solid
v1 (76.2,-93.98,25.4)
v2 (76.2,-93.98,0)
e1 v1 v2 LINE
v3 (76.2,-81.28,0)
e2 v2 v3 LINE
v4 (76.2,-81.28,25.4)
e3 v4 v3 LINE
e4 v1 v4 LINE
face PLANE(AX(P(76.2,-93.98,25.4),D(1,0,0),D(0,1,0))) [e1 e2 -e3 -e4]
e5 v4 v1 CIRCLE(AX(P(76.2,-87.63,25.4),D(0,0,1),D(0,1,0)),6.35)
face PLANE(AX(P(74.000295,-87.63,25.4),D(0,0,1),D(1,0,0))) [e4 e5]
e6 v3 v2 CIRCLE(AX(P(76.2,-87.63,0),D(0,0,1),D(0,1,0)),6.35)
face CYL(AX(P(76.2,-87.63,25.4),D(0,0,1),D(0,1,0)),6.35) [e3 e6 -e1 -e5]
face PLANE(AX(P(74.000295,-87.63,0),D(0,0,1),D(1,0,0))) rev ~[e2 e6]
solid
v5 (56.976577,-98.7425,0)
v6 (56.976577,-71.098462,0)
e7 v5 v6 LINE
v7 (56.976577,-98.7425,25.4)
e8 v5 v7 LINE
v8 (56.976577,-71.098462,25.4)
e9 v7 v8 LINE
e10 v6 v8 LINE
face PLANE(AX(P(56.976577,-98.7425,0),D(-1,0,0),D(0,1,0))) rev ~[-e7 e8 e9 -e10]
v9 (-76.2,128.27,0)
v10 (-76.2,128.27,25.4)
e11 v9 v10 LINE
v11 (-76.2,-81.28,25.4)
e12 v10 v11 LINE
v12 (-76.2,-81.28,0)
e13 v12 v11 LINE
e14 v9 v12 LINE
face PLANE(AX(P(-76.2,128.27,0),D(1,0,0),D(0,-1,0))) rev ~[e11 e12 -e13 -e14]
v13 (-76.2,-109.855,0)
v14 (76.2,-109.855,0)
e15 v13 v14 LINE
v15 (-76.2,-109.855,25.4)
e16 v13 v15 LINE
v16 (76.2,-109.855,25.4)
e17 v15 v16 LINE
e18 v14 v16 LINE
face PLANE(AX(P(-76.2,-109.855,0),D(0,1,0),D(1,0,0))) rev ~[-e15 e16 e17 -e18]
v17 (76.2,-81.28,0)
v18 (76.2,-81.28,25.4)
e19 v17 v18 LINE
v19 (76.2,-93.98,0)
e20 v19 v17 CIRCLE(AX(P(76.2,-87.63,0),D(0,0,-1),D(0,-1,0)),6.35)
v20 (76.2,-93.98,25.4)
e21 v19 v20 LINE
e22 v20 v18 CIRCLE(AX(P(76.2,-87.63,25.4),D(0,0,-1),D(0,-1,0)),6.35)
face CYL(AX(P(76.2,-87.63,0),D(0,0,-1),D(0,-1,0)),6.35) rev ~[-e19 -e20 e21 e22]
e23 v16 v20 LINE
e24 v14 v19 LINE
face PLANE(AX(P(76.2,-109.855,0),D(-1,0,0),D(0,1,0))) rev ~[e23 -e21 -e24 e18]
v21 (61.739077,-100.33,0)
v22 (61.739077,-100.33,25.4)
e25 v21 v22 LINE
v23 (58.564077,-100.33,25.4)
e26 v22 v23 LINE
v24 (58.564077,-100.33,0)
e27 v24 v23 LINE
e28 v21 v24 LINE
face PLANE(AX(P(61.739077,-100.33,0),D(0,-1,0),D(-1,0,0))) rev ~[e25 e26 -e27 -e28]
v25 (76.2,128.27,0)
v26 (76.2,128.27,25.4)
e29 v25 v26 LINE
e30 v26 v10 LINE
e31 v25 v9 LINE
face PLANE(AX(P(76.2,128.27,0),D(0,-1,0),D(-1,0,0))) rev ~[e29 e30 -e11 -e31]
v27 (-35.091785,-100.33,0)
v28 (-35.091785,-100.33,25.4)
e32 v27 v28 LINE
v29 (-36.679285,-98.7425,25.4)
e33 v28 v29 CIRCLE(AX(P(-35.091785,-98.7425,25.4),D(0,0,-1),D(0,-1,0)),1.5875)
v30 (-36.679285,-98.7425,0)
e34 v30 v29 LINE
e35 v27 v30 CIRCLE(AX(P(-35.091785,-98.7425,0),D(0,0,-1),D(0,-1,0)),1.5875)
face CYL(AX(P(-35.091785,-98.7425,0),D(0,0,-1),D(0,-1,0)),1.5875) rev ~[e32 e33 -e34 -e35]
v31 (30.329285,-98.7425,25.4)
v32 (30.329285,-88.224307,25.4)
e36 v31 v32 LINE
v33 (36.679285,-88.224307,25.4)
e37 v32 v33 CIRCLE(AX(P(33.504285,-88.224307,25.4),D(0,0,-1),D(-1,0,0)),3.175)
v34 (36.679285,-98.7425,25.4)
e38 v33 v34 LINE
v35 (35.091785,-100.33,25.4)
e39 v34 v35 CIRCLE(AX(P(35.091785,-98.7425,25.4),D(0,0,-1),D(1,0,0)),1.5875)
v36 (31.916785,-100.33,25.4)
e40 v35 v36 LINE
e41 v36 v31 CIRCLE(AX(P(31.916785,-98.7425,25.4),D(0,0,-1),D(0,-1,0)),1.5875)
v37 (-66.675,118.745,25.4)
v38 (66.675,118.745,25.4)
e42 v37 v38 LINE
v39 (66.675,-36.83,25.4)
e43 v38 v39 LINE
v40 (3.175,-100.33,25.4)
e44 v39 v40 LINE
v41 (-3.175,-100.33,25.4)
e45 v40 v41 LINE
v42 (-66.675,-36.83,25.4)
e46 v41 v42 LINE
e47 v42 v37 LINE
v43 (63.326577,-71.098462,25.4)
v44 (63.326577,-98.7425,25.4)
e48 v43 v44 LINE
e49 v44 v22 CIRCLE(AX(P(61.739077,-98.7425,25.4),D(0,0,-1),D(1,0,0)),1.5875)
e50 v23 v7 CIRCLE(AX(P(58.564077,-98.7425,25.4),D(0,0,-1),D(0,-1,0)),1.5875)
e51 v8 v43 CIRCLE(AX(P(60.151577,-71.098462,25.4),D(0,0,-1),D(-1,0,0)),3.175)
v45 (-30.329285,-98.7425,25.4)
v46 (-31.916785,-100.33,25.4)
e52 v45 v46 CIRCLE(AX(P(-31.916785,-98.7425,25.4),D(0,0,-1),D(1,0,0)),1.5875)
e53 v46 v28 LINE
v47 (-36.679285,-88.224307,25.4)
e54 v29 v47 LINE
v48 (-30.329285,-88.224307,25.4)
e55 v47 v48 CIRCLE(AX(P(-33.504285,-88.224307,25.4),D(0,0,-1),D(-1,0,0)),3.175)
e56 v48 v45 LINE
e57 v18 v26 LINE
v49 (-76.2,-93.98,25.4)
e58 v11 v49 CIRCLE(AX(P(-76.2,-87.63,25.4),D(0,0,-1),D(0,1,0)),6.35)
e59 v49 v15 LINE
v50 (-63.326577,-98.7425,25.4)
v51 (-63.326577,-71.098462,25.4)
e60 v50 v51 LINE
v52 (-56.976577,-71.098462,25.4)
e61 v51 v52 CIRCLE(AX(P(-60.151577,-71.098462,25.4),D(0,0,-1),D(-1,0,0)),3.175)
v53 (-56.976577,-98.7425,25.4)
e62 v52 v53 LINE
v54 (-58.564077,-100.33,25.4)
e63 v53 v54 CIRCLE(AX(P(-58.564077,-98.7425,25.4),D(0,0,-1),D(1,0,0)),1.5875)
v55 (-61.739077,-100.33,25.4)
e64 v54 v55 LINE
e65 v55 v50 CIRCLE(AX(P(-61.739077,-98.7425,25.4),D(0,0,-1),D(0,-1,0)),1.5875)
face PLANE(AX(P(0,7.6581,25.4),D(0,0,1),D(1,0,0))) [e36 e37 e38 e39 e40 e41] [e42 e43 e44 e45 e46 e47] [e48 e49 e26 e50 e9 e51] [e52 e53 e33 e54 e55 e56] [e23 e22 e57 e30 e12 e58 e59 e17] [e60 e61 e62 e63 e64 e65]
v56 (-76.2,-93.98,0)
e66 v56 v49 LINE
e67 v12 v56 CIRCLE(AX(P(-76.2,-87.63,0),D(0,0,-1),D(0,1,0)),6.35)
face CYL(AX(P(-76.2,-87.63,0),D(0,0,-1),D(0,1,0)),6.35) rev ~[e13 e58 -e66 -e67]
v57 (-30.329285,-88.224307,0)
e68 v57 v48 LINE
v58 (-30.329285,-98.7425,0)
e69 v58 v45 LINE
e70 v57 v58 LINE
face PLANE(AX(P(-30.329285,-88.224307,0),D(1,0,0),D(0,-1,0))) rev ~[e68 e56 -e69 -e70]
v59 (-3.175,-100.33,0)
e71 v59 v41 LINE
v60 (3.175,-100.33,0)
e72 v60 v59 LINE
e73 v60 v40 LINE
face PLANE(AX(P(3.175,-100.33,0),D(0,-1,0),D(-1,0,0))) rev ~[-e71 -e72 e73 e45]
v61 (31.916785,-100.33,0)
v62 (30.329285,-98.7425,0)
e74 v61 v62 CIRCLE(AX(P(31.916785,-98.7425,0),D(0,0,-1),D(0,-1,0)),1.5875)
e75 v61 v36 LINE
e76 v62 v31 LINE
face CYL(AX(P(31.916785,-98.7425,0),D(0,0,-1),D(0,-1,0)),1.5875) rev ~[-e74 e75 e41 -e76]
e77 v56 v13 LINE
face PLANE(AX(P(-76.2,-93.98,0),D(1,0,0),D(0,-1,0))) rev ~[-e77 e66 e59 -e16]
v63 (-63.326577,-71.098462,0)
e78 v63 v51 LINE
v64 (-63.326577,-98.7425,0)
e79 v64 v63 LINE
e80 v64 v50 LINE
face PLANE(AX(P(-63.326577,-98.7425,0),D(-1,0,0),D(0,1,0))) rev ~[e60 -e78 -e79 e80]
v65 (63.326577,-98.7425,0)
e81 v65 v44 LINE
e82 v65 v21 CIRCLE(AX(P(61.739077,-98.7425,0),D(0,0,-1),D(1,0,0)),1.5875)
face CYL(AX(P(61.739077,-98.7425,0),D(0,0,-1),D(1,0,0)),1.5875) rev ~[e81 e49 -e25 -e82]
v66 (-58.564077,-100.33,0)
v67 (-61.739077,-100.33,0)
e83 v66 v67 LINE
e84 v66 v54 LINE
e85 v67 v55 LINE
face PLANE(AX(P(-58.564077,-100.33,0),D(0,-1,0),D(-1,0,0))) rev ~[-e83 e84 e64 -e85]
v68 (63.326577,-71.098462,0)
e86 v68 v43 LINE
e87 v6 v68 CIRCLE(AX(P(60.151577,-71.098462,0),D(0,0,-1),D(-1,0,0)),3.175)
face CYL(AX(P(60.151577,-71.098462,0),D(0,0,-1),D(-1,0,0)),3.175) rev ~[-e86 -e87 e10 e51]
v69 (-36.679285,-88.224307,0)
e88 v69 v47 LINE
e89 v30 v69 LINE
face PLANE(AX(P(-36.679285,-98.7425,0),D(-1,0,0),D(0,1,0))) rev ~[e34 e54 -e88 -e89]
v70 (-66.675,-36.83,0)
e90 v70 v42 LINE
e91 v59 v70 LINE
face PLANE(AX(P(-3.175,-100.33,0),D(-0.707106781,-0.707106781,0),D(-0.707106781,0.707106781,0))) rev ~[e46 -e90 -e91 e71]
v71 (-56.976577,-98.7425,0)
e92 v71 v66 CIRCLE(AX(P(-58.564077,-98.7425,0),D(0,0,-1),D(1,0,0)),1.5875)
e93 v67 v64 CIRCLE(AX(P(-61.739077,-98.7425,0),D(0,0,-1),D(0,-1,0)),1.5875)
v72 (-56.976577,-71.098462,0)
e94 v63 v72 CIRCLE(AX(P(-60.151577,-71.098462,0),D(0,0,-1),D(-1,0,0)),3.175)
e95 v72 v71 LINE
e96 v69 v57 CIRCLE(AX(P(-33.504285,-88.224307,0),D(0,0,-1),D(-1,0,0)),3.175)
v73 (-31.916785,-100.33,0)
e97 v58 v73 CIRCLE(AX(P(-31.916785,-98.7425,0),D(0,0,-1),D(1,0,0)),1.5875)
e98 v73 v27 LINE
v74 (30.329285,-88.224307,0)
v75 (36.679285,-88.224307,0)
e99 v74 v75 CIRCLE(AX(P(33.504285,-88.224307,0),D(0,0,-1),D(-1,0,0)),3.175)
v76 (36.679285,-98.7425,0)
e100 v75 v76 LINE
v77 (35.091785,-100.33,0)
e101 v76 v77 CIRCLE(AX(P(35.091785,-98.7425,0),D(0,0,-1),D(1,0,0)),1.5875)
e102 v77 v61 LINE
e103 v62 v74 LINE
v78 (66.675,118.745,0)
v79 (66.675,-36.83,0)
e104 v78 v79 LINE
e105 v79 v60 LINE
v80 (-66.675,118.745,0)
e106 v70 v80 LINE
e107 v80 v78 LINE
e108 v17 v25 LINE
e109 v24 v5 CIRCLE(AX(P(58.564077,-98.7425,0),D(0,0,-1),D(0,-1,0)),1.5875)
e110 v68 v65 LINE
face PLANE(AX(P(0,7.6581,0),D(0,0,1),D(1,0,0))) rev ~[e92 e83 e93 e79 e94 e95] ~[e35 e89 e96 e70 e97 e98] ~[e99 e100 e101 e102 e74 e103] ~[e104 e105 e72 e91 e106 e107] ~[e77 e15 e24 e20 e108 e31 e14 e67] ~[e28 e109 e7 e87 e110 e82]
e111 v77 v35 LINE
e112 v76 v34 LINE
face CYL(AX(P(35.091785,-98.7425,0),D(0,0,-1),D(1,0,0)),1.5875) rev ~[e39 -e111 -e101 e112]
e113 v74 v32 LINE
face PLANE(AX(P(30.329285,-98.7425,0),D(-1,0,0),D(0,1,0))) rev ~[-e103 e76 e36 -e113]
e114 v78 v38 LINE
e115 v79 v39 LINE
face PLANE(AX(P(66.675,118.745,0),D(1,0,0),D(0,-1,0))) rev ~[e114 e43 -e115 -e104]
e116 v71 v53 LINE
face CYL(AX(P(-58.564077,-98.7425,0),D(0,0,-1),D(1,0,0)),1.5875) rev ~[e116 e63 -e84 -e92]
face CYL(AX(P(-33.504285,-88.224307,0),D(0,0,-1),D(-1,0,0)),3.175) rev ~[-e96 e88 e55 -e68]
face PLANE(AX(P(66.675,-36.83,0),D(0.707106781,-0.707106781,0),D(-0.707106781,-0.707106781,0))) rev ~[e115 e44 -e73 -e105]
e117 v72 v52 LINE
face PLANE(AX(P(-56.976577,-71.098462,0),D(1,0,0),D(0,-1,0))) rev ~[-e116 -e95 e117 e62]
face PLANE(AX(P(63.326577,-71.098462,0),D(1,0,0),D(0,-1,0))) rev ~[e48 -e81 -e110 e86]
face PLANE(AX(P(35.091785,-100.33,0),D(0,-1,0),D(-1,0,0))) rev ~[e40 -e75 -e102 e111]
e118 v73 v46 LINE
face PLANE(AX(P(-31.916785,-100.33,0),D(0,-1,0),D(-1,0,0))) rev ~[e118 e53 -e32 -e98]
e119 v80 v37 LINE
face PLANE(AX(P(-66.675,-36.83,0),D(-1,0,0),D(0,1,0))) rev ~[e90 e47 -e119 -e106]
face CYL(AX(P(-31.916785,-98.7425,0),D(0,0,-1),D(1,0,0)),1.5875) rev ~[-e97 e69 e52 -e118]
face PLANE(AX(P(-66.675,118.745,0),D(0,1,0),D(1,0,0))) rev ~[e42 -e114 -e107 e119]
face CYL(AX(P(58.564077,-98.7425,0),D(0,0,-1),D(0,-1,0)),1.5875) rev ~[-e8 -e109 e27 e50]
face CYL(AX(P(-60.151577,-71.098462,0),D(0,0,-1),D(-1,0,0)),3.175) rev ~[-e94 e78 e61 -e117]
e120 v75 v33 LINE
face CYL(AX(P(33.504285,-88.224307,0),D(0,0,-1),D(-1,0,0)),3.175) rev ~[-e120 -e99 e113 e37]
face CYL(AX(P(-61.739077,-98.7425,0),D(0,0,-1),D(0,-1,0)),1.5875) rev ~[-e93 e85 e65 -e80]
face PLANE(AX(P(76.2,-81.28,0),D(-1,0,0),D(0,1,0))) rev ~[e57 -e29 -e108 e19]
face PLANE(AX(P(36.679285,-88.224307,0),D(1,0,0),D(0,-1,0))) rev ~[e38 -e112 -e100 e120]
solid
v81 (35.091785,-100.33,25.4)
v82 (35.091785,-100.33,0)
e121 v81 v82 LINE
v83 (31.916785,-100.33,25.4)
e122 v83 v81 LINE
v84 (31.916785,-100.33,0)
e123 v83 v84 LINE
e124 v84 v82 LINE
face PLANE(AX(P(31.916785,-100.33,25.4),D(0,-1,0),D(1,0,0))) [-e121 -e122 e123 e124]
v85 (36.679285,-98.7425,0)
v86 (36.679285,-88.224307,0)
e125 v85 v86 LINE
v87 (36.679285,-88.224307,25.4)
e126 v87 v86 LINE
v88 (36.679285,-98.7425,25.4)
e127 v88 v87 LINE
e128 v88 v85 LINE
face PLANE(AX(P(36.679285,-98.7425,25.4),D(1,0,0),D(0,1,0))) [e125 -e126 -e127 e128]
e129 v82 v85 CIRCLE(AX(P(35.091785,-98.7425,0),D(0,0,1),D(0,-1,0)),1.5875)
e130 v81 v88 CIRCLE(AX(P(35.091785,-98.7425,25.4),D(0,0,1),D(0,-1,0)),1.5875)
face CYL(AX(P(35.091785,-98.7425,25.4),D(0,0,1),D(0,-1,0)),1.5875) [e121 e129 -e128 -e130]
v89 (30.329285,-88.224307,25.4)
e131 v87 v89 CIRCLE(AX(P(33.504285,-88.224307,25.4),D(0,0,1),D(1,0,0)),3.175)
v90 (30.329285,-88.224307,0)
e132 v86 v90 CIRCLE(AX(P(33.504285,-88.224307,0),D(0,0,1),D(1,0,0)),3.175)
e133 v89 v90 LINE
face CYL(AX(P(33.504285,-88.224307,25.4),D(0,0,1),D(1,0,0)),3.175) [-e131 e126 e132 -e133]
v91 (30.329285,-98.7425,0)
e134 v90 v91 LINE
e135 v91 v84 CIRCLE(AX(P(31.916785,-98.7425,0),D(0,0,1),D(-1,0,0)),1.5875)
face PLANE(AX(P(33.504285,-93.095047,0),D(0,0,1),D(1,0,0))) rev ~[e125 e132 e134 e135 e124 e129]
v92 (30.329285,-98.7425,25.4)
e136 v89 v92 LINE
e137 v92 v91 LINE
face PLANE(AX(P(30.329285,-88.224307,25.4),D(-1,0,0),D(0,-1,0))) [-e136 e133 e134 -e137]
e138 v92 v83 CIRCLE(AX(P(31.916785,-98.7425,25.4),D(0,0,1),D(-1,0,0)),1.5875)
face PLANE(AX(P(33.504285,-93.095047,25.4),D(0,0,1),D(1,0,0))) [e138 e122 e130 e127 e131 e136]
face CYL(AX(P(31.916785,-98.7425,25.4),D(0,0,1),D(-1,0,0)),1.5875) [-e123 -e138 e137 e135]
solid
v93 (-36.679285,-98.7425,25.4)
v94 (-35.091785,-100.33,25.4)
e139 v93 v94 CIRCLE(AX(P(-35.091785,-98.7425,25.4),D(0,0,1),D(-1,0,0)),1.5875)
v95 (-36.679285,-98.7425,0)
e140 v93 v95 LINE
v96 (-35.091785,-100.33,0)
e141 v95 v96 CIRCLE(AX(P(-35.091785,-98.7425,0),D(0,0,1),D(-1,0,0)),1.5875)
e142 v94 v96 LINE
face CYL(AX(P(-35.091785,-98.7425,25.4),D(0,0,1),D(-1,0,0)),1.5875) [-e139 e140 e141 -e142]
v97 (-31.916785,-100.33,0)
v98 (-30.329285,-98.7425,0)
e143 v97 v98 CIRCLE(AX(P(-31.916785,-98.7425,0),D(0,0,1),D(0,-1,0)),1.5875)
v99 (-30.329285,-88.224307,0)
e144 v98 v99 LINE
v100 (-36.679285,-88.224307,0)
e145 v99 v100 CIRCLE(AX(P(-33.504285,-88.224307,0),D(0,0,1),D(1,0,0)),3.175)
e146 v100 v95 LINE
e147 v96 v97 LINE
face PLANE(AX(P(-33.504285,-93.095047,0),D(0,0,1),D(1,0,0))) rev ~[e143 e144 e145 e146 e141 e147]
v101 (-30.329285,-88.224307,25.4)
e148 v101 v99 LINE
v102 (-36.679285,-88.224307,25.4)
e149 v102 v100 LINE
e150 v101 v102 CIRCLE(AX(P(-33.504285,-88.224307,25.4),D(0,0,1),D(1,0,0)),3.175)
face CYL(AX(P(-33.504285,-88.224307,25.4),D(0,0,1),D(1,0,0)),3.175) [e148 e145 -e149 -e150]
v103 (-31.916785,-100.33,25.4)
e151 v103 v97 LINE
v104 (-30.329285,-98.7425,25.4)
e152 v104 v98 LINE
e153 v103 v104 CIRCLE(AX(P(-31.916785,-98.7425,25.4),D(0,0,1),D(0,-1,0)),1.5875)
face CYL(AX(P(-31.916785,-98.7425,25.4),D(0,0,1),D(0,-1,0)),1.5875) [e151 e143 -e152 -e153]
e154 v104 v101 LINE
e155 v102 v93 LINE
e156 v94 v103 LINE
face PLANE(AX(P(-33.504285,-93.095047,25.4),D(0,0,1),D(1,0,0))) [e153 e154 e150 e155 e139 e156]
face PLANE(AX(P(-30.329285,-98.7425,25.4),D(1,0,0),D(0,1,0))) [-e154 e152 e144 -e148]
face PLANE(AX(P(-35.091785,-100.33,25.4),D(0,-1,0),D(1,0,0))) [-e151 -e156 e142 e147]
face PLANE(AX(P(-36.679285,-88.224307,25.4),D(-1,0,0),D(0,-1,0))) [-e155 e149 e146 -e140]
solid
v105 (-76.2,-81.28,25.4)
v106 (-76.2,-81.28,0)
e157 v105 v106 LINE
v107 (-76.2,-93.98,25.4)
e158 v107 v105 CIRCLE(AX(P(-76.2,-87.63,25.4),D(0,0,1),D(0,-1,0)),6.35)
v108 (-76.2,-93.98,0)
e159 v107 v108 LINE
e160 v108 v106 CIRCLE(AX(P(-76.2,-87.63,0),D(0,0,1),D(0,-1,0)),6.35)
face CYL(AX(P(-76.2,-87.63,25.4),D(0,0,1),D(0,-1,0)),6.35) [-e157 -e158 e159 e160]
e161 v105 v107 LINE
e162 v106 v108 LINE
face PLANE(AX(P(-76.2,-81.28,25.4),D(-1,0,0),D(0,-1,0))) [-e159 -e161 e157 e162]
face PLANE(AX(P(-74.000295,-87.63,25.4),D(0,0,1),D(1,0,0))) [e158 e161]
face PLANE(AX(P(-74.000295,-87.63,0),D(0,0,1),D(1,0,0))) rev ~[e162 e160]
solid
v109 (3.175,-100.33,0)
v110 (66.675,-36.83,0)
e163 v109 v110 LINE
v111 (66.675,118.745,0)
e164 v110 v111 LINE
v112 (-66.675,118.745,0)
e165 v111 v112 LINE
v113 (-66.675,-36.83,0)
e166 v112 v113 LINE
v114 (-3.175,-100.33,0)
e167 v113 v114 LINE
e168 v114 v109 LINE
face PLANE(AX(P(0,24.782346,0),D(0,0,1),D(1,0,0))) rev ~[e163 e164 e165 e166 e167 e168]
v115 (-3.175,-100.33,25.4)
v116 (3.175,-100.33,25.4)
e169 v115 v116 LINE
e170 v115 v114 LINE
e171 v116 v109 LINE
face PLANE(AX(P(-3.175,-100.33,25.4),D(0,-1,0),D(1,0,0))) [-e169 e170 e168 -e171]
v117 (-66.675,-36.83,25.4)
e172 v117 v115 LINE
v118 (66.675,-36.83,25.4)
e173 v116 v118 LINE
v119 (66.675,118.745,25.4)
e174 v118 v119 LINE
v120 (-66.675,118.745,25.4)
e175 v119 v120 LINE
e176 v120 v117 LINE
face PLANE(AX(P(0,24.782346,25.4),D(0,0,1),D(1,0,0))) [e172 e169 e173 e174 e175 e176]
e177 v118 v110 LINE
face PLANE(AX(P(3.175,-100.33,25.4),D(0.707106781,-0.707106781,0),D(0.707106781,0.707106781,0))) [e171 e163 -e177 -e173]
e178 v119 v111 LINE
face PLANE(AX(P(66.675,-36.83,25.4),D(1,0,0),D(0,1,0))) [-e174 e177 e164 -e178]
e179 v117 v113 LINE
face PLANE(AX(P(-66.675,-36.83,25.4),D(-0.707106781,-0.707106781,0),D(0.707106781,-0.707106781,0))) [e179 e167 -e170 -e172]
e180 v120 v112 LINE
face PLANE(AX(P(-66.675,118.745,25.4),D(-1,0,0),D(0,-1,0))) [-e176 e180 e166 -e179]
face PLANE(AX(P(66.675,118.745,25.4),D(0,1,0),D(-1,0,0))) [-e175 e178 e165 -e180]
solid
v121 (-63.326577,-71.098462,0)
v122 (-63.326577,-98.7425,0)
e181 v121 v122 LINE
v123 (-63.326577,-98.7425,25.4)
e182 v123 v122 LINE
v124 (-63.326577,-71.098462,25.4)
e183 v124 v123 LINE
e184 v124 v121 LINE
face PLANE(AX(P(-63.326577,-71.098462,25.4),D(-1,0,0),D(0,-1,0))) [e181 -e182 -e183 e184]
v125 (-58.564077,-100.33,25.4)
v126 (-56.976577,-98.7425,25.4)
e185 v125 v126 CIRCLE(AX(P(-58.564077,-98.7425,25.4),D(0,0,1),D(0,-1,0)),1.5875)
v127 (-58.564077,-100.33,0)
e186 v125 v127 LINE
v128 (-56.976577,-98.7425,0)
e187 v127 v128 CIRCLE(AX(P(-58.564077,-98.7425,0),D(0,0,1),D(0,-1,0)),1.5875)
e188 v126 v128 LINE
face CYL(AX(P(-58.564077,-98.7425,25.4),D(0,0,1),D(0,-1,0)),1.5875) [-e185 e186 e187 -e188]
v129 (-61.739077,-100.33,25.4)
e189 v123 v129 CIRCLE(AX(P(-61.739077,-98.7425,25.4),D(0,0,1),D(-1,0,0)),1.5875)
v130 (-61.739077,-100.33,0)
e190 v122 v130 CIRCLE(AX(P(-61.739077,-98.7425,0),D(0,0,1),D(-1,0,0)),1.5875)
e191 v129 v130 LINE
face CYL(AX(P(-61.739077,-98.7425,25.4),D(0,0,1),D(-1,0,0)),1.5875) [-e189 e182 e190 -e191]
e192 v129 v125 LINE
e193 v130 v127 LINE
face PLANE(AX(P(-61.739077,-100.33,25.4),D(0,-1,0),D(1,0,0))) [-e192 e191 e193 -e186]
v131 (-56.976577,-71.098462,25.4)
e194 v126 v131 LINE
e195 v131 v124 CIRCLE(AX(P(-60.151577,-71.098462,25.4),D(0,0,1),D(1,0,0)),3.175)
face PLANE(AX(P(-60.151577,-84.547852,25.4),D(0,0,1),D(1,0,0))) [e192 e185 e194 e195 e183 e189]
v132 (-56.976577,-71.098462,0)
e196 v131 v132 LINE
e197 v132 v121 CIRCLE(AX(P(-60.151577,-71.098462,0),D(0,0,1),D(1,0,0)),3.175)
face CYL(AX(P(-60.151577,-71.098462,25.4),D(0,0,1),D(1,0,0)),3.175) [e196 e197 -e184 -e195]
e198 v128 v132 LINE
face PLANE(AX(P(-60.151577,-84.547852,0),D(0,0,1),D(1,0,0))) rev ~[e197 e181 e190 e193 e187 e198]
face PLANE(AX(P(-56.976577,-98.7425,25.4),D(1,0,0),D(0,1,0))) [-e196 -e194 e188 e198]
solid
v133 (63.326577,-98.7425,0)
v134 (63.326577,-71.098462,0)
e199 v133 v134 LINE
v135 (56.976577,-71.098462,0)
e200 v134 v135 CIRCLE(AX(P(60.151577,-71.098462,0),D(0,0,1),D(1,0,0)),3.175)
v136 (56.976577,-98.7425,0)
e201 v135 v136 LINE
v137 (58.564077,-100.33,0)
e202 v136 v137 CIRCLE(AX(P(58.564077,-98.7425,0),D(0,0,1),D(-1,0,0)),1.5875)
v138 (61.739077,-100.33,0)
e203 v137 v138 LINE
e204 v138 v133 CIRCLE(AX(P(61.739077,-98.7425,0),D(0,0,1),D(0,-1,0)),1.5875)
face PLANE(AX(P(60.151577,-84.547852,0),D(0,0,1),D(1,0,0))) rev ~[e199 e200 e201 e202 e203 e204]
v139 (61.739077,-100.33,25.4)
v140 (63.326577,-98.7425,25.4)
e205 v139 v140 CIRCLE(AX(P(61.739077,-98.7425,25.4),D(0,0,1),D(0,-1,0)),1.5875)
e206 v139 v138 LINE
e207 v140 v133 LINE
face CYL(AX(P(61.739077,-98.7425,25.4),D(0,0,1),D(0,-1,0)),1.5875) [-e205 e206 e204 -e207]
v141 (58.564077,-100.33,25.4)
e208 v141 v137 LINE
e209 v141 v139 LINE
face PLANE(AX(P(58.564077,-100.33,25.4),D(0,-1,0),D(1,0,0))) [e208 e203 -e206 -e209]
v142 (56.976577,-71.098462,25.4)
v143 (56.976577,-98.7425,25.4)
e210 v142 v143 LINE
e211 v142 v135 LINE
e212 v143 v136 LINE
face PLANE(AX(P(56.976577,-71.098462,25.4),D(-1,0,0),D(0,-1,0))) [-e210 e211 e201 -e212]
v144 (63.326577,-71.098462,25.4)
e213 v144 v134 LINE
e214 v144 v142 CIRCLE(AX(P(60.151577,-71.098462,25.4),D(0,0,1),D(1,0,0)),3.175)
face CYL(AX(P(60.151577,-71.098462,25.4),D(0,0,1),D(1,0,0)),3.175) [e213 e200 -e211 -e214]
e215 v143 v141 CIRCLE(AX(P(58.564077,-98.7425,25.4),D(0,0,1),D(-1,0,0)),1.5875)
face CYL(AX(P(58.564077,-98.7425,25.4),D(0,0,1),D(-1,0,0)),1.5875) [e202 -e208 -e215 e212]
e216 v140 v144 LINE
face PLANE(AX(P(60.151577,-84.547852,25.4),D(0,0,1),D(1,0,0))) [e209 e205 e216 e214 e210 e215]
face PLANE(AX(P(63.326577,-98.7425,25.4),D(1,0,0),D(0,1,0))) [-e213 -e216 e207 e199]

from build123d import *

# Parameters (mm, degrees)
F1_DEPTH = 25.4
F3_DEPTH = 25.4


with BuildPart() as f1:
    # F0 (on Top) → F1 (new body)
    with BuildSketch(Plane.XY):
        with BuildLine():
            Line((76.2, 128.27), (-76.2, 128.27))
            Line((-76.2, 128.27), (-76.2, -81.28))
            ThreePointArc((-76.2, -81.28), (-69.85, -87.63), (-76.2, -93.98))
            Line((-76.2, -93.98), (-76.2, -109.855))
            Line((-76.2, -109.855), (76.2, -109.855))
            Line((76.2, -109.855), (76.2, -93.98))
            ThreePointArc((76.2, -93.98), (69.85, -87.63), (76.2, -81.28))
            Line((76.2, -81.28), (76.2, 128.27))
        make_face()
        with BuildLine():
            Line((-56.9765769958, -71.0984617472), (-56.9765769958, -98.7425))
            ThreePointArc((-56.9765769958, -98.7425), (-57.4415449807, -99.8650320151), (-58.5640769958, -100.33))
            Line((-58.5640769958, -100.33), (-61.7390769958, -100.33))
            ThreePointArc((-61.7390769958, -100.33), (-62.861609011, -99.8650320151), (-63.3265769958, -98.7425))
            Line((-63.3265769958, -98.7425), (-63.3265769958, -71.0984617472))
            ThreePointArc((-63.3265769958, -71.0984617472), (-60.1515769958, -67.9234617472), (-56.9765769958, -71.0984617472))
        make_face(mode=Mode.SUBTRACT)
        with BuildLine():
            Line((-30.3292849183, -88.2243067026), (-30.3292849183, -98.7425))
            ThreePointArc((-30.3292849183, -98.7425), (-30.7942529032, -99.8650320151), (-31.9167849183, -100.33))
            Line((-31.9167849183, -100.33), (-35.0917849183, -100.33))
            ThreePointArc((-35.0917849183, -100.33), (-36.2143169334, -99.8650320151), (-36.6792849183, -98.7425))
            Line((-36.6792849183, -98.7425), (-36.6792849183, -88.2243067026))
            ThreePointArc((-36.6792849183, -88.2243067026), (-33.5042849183, -85.0493067026), (-30.3292849183, -88.2243067026))
        make_face(mode=Mode.SUBTRACT)
        with BuildLine():
            Line((36.6792849183, -88.2243067026), (36.6792849183, -98.7425))
            ThreePointArc((36.6792849183, -98.7425), (36.2143169334, -99.8650320151), (35.0917849183, -100.33))
            Line((35.0917849183, -100.33), (31.9167849183, -100.33))
            ThreePointArc((31.9167849183, -100.33), (30.7942529032, -99.8650320151), (30.3292849183, -98.7425))
            Line((30.3292849183, -98.7425), (30.3292849183, -88.2243067026))
            ThreePointArc((30.3292849183, -88.2243067026), (33.5042849183, -85.0493067026), (36.6792849183, -88.2243067026))
        make_face(mode=Mode.SUBTRACT)
        with BuildLine():
            ThreePointArc((58.5640769958, -100.33), (57.4415449807, -99.8650320151), (56.9765769958, -98.7425))
            Line((56.9765769958, -98.7425), (56.9765769958, -71.0984617472))
            ThreePointArc((56.9765769958, -71.0984617472), (60.1515769958, -67.9234617472), (63.3265769958, -71.0984617472))
            Line((63.3265769958, -71.0984617472), (63.3265769958, -98.7425))
            ThreePointArc((63.3265769958, -98.7425), (62.861609011, -99.8650320151), (61.7390769958, -100.33))
            Line((61.7390769958, -100.33), (58.5640769958, -100.33))
        make_face(mode=Mode.SUBTRACT)
        Polygon((-66.675, 118.745), (66.675, 118.745), (66.675, -36.83), (3.175, -100.33), (0, -100.33), (-3.175, -100.33), (-66.675, -36.83), align=None, mode=Mode.SUBTRACT)
    extrude(amount=F1_DEPTH)


with BuildPart() as f3:
    # F2 (on face) → F3 (new body)
    with BuildSketch(Plane.XY.offset(25.4)):
        Polygon((-66.675, -36.83), (-3.175, -100.33), (3.175, -100.33), (66.675, -36.83), (66.675, 118.745), (-66.675, 118.745), align=None)
    extrude(amount=-F3_DEPTH)


with BuildPart() as f3b:
    # F2 (on face) → F3, piece 2 (new body)
    with BuildSketch(Plane.XY.offset(25.4)):
        with BuildLine():
            Line((-63.3265769958, -71.0984617472), (-63.3265769958, -98.7425))
            ThreePointArc((-63.3265769958, -98.7425), (-62.861609011, -99.8650320151), (-61.7390769958, -100.33))
            Line((-61.7390769958, -100.33), (-58.5640769958, -100.33))
            ThreePointArc((-58.5640769958, -100.33), (-57.4415449807, -99.8650320151), (-56.9765769958, -98.7425))
            Line((-56.9765769958, -98.7425), (-56.9765769958, -71.0984617472))
            ThreePointArc((-56.9765769958, -71.0984617472), (-60.1515769958, -67.9234617472), (-63.3265769958, -71.0984617472))
        make_face()
    extrude(amount=-F3_DEPTH)


with BuildPart() as f3c:
    # F2 (on face) → F3, piece 3 (new body)
    with BuildSketch(Plane.XY.offset(25.4)):
        with BuildLine():
            Line((-76.2, -81.28), (-76.2, -93.98))
            ThreePointArc((-76.2, -93.98), (-69.85, -87.63), (-76.2, -81.28))
        make_face()
    extrude(amount=-F3_DEPTH)


with BuildPart() as f3d:
    # F2 (on face) → F3, piece 4 (new body)
    with BuildSketch(Plane.XY.offset(25.4)):
        with BuildLine():
            Line((-36.6792849183, -88.2243067026), (-36.6792849183, -98.7425))
            ThreePointArc((-36.6792849183, -98.7425), (-36.2143169334, -99.8650320151), (-35.0917849183, -100.33))
            Line((-35.0917849183, -100.33), (-31.9167849183, -100.33))
            ThreePointArc((-31.9167849183, -100.33), (-30.7942529032, -99.8650320151), (-30.3292849183, -98.7425))
            Line((-30.3292849183, -98.7425), (-30.3292849183, -88.2243067026))
            ThreePointArc((-30.3292849183, -88.2243067026), (-33.5042849183, -85.0493067026), (-36.6792849183, -88.2243067026))
        make_face()
    extrude(amount=-F3_DEPTH)


with BuildPart() as f3e:
    # F2 (on face) → F3, piece 5 (new body)
    with BuildSketch(Plane.XY.offset(25.4)):
        with BuildLine():
            Line((30.3292849183, -88.2243067026), (30.3292849183, -98.7425))
            ThreePointArc((30.3292849183, -98.7425), (30.7942529032, -99.8650320151), (31.9167849183, -100.33))
            Line((31.9167849183, -100.33), (35.0917849183, -100.33))
            ThreePointArc((35.0917849183, -100.33), (36.2143169334, -99.8650320151), (36.6792849183, -98.7425))
            Line((36.6792849183, -98.7425), (36.6792849183, -88.2243067026))
            ThreePointArc((36.6792849183, -88.2243067026), (33.5042849183, -85.0493067026), (30.3292849183, -88.2243067026))
        make_face()
    extrude(amount=-F3_DEPTH)


with BuildPart() as f3f:
    # F2 (on face) → F3, piece 6 (new body)
    with BuildSketch(Plane.XY.offset(25.4)):
        with BuildLine():
            ThreePointArc((61.7390769958, -100.33), (62.861609011, -99.8650320151), (63.3265769958, -98.7425))
            Line((63.3265769958, -98.7425), (63.3265769958, -71.0984617472))
            ThreePointArc((63.3265769958, -71.0984617472), (60.1515769958, -67.9234617472), (56.9765769958, -71.0984617472))
            Line((56.9765769958, -71.0984617472), (56.9765769958, -98.7425))
            ThreePointArc((56.9765769958, -98.7425), (57.4415449807, -99.8650320151), (58.5640769958, -100.33))
            Line((58.5640769958, -100.33), (61.7390769958, -100.33))
        make_face()
    extrude(amount=-F3_DEPTH)


with BuildPart() as f3g:
    # F2 (on face) → F3, piece 7 (new body)
    with BuildSketch(Plane.XY.offset(25.4)):
        with BuildLine():
            ThreePointArc((76.2, -81.28), (69.85, -87.63), (76.2, -93.98))
            Line((76.2, -93.98), (76.2, -81.28))
        make_face()
    extrude(amount=-F3_DEPTH)


solid = Compound([f1.part, f3.part, f3b.part, f3c.part, f3d.part, f3e.part, f3f.part, f3g.part])
